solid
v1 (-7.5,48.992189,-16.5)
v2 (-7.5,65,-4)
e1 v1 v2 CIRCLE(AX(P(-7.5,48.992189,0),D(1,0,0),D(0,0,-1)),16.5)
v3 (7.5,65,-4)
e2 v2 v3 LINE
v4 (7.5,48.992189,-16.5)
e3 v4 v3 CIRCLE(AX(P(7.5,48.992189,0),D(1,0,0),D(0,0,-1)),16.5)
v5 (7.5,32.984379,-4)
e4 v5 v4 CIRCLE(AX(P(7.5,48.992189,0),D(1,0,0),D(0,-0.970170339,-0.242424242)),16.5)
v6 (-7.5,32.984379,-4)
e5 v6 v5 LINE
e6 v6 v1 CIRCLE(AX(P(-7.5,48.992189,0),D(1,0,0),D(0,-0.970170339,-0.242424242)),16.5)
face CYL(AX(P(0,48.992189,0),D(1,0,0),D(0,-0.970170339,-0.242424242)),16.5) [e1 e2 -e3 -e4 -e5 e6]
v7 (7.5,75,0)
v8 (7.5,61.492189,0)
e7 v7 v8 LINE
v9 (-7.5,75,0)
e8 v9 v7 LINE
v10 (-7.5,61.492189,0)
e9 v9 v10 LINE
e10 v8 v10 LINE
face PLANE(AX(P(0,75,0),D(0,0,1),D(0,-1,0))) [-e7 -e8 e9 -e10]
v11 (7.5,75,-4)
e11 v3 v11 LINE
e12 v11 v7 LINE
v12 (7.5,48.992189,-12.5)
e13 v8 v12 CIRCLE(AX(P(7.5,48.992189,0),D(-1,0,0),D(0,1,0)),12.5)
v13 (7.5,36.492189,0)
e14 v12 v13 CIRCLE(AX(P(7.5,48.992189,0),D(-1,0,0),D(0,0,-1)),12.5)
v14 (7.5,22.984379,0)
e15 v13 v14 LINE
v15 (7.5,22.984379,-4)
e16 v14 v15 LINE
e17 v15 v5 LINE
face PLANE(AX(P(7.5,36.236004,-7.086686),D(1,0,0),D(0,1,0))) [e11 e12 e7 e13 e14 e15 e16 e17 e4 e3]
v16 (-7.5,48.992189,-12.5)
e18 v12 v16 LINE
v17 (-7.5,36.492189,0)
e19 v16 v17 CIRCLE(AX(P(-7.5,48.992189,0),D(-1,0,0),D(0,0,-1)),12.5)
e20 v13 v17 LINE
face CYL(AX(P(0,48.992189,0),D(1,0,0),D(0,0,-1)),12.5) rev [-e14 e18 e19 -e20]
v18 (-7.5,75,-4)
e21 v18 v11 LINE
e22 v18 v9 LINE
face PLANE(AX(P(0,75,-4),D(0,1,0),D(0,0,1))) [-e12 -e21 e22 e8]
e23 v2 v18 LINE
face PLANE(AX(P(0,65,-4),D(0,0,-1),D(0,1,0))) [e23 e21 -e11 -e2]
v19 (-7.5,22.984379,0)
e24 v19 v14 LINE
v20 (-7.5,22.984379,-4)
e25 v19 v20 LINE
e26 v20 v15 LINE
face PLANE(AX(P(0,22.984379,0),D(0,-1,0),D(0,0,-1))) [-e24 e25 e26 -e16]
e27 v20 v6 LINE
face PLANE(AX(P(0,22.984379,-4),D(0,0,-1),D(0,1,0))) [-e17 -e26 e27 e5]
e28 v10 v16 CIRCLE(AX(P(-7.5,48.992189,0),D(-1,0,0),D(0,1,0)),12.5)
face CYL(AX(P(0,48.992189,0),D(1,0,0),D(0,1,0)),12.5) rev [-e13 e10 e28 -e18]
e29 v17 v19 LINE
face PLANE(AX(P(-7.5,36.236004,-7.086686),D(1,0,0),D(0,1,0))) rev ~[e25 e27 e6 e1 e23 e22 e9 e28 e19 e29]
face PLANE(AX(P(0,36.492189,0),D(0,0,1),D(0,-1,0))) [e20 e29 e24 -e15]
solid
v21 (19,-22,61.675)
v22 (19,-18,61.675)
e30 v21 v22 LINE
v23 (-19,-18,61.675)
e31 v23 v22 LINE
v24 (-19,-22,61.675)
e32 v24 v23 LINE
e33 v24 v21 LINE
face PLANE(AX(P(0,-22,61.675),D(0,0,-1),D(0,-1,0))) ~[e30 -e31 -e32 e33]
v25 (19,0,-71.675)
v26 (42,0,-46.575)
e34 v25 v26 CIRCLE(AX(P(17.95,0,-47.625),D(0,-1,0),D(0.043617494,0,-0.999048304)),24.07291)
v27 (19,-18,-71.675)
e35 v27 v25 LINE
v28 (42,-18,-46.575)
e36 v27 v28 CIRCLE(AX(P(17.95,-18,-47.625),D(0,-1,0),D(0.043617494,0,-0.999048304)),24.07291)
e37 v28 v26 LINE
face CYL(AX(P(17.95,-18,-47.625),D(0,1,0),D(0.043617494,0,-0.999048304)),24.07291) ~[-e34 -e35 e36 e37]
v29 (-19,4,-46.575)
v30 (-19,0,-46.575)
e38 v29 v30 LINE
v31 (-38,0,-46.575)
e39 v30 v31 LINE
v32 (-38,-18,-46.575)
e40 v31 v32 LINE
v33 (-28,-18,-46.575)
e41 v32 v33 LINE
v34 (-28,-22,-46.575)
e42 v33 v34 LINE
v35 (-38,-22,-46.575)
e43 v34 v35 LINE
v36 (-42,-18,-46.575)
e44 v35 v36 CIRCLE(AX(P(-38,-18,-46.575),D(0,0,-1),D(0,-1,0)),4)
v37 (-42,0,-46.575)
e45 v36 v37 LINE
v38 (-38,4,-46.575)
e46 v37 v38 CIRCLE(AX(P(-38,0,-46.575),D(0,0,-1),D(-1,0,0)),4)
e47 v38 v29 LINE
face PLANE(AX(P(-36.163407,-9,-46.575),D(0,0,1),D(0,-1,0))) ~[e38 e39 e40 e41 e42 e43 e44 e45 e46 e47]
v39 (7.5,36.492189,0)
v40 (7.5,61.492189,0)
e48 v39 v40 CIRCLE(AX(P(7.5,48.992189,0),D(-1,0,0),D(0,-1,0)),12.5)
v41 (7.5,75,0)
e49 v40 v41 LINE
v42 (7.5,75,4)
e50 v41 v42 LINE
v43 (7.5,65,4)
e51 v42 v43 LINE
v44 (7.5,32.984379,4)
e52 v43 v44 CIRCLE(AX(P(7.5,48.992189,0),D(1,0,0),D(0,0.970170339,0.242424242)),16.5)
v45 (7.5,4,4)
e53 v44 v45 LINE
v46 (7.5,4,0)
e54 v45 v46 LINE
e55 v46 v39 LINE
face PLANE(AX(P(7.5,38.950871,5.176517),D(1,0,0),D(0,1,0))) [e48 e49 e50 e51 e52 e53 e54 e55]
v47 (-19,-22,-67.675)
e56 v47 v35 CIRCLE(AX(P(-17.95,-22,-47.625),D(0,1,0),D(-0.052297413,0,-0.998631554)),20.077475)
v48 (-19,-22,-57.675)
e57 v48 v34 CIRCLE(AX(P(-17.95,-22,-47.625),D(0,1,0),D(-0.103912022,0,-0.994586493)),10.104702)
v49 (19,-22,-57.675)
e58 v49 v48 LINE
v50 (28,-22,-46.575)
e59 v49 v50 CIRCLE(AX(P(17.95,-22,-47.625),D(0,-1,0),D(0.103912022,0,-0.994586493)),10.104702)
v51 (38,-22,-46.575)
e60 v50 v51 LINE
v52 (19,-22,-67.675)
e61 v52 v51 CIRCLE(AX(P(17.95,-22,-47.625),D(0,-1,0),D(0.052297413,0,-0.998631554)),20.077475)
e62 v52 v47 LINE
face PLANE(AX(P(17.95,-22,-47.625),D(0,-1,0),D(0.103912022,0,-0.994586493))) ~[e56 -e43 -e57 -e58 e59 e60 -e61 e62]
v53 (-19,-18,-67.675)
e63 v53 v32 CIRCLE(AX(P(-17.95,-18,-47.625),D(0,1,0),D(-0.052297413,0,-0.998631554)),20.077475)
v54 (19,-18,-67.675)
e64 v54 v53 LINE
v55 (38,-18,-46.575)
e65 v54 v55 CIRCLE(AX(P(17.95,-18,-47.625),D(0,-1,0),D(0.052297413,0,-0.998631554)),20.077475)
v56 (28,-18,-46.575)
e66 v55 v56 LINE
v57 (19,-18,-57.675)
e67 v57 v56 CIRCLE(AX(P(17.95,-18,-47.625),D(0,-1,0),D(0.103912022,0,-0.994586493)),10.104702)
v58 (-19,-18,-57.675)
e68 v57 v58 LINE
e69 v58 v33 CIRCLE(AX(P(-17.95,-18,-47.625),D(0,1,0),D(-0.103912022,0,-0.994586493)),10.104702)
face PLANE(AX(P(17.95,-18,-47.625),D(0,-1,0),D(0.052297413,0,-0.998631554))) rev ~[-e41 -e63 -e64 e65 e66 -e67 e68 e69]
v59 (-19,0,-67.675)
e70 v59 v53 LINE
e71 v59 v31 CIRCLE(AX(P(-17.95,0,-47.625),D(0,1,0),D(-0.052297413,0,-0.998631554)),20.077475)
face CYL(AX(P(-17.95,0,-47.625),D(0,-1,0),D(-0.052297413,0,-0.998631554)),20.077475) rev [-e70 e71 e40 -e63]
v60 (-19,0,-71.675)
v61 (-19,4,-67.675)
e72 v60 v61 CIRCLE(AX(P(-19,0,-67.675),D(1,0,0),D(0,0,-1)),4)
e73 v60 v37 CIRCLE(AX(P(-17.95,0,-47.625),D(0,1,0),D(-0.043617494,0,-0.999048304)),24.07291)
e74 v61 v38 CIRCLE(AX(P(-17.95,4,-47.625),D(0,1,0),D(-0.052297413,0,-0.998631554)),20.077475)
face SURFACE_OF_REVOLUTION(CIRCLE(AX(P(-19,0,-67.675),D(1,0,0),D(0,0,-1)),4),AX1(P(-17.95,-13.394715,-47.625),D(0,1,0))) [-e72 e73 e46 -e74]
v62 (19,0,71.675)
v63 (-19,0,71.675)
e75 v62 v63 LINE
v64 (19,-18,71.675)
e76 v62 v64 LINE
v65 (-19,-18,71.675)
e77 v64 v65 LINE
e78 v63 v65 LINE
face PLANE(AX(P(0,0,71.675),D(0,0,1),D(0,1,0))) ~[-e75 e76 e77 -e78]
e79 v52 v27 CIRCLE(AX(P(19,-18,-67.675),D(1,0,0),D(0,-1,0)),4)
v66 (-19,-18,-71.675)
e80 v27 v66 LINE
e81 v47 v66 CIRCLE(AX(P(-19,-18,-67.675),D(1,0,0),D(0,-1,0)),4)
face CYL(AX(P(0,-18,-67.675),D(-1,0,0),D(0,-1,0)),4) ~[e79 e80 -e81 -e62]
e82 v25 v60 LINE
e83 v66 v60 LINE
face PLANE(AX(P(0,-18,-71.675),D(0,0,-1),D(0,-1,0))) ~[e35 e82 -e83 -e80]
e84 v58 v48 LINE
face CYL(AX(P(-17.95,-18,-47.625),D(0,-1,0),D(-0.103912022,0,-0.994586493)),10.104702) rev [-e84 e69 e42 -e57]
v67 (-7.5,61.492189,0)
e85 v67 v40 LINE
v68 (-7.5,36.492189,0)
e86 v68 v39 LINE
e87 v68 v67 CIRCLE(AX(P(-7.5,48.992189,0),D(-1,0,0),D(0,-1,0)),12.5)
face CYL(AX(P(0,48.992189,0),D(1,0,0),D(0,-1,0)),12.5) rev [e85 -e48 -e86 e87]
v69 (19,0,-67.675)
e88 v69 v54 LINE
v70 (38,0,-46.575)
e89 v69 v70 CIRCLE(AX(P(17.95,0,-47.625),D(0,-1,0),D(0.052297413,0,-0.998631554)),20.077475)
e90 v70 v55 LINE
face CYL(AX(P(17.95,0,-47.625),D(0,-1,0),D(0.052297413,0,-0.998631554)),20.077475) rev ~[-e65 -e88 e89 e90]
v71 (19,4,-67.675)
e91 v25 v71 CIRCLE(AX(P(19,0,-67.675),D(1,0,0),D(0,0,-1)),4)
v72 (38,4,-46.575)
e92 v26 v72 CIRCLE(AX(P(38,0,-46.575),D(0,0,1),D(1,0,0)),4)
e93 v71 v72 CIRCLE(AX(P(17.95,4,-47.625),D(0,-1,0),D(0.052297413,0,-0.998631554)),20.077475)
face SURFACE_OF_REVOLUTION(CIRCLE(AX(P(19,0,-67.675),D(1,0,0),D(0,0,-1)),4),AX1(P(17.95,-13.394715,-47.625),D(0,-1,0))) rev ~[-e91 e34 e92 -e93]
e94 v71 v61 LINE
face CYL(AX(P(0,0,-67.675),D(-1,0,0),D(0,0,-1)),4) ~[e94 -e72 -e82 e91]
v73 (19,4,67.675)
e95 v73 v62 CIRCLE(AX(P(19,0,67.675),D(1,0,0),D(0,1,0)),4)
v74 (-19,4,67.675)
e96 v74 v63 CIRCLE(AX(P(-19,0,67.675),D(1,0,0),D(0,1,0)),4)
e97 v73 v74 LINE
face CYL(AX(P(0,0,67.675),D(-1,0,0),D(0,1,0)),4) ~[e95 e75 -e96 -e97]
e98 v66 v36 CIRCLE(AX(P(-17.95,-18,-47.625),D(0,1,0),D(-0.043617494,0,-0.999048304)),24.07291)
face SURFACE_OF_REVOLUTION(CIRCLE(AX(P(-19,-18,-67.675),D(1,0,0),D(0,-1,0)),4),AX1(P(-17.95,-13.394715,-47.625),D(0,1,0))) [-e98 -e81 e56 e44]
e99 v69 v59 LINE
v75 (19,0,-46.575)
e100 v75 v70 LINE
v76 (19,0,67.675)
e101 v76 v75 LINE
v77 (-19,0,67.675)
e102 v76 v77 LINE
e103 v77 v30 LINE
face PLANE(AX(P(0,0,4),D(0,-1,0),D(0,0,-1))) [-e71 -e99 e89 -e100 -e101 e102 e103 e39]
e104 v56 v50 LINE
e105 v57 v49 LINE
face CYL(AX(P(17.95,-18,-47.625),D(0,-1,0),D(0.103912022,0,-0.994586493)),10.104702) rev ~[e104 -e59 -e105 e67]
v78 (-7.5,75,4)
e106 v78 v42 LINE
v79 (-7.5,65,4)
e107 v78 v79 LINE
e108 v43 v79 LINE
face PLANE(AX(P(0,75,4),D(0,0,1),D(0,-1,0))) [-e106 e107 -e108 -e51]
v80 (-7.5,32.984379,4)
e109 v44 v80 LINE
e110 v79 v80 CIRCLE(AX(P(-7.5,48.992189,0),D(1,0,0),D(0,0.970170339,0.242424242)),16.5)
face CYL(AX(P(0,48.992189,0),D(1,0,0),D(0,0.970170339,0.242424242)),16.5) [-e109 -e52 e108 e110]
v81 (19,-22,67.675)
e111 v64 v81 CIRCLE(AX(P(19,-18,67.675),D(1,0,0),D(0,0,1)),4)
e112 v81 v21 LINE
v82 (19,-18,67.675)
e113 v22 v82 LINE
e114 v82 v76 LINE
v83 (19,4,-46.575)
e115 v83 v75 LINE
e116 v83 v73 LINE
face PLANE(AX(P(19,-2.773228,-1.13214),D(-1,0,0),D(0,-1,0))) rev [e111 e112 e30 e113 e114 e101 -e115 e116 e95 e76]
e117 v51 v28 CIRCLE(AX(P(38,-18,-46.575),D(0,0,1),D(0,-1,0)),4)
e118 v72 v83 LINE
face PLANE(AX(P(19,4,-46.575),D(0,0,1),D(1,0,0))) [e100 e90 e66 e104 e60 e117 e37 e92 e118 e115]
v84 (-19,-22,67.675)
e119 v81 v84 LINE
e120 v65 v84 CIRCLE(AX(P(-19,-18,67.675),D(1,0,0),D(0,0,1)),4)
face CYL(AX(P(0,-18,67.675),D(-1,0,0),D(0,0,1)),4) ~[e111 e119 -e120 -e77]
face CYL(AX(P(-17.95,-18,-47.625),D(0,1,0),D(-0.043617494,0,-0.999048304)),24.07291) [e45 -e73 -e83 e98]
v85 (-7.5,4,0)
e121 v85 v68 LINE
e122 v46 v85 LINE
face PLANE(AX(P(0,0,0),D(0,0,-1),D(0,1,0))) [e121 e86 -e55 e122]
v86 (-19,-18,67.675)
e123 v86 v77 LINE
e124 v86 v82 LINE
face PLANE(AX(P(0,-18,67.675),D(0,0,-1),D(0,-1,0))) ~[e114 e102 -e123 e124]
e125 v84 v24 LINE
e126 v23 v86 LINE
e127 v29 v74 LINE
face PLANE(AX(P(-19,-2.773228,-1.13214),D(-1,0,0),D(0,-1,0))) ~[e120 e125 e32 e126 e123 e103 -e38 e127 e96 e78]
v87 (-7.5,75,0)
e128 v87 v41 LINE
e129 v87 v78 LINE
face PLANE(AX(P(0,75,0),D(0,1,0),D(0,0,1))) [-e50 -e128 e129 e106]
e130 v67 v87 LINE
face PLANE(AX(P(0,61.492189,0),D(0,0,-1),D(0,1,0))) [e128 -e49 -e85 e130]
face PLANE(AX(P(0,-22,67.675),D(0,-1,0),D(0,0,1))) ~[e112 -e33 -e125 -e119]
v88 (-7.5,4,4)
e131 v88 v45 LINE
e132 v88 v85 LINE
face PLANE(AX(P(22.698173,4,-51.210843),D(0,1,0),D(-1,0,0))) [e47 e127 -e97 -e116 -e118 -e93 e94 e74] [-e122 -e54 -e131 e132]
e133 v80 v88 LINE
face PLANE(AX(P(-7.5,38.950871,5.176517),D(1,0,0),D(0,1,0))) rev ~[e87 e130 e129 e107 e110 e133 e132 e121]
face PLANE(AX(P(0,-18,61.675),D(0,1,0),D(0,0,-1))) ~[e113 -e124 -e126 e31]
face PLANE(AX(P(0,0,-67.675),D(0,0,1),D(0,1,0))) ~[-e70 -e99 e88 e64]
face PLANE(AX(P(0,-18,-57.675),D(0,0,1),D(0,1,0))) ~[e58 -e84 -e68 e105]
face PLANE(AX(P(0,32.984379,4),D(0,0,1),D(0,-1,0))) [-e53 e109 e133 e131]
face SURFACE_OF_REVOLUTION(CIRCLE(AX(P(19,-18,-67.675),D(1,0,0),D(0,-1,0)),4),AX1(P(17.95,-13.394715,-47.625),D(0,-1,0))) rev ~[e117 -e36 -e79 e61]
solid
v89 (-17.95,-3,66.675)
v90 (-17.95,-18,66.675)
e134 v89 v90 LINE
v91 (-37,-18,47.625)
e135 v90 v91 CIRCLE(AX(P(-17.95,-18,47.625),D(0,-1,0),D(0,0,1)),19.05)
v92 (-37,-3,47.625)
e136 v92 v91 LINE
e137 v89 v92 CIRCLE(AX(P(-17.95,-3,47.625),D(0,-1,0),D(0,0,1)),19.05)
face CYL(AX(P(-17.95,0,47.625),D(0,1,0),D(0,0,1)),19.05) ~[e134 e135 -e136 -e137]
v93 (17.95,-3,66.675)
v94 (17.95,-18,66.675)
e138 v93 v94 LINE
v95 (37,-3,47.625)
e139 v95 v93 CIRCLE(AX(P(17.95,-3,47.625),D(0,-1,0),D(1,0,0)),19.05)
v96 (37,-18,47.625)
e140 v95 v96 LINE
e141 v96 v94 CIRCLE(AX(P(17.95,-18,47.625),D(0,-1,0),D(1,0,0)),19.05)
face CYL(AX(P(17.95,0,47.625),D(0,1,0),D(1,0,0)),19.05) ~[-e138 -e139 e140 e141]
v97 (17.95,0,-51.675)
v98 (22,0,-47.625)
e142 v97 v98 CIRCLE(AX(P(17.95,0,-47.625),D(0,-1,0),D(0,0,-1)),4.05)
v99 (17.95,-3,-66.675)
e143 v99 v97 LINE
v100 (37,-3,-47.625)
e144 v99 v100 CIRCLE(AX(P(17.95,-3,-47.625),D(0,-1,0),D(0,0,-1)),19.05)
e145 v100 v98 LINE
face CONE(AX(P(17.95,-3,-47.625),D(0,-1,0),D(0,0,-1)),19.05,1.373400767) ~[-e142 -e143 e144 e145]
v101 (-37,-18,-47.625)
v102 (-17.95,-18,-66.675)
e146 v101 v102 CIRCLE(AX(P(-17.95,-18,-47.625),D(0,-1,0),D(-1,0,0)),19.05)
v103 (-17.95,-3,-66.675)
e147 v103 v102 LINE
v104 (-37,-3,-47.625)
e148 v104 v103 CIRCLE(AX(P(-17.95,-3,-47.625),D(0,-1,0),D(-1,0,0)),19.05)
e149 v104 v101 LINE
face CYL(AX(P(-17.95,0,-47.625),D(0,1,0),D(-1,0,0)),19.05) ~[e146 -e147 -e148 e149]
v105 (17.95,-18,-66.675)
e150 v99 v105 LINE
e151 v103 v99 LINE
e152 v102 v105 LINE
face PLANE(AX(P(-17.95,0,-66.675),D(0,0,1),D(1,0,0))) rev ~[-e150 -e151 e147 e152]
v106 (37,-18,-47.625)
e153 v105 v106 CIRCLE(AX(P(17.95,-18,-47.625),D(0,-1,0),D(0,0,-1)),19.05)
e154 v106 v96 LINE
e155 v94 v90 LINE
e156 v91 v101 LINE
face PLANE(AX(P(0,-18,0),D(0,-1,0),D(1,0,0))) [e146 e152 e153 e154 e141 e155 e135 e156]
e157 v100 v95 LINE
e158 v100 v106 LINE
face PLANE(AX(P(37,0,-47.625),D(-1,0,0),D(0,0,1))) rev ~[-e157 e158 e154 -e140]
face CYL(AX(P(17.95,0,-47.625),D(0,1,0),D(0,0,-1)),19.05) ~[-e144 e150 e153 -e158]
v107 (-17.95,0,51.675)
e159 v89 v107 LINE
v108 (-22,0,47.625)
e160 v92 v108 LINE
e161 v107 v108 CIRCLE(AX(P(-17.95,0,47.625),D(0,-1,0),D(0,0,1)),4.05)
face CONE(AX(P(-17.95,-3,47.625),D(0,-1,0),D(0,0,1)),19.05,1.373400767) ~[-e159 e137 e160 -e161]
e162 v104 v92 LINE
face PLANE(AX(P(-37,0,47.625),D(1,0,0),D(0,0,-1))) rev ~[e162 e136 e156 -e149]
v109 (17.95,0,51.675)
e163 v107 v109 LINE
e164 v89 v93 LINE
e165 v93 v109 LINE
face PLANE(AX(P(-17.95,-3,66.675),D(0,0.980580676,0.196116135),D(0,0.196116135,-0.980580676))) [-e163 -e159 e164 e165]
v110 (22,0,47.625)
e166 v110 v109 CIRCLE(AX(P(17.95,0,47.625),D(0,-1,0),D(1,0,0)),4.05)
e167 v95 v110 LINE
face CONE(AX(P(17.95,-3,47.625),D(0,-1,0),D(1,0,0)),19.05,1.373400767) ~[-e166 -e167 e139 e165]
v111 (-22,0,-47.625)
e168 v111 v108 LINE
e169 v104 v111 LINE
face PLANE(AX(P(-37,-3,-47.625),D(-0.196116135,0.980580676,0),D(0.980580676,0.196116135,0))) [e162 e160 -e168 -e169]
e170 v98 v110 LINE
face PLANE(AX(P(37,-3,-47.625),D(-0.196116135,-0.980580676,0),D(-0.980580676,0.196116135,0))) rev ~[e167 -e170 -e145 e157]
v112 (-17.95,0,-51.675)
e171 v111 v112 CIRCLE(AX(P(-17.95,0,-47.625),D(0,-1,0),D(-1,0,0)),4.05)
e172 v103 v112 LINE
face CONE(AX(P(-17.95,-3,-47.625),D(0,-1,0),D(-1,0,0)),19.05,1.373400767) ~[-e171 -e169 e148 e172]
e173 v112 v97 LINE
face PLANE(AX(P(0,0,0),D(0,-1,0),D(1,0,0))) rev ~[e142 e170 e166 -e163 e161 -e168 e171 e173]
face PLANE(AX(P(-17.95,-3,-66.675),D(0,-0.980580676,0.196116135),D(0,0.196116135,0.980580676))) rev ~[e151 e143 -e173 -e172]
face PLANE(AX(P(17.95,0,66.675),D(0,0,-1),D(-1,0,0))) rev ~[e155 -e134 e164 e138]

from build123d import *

# Parameters (mm, degrees)
F1_DEPTH     = 18
F2_T1_DEPTH  = 35.9
F2_T3_DEPTH  = 95.25
F2_T6_ANGLE  = 90
F2_T8_ANGLE  = 90
F2_T10_ANGLE = 90
F2_T12_ANGLE = 90
F4_DEPTH     = 19
F8_ANGLE     = 90
F12_DEPTH    = 4
F14_DEPTH    = 7.5
F15_DEPTH    = 7.5


# Not quite as in the source:
# - a fillet or chamfer that OpenCascade refuses, or shapes differently, is made with other operations: its cross-section is extruded or revolved along the edge and cut away or added


with BuildPart() as f1:
    # F0 (on Front) → F1 (new body)
    with BuildSketch(Plane.XZ):
        with BuildLine():
            Line((-17.95, -66.675), (17.95, -66.675))
            ThreePointArc((17.95, -66.675), (31.4203841816, -61.0953841816), (37, -47.625))
            Line((37, -47.625), (37, 47.625))
            ThreePointArc((37, 47.625), (31.4203841816, 61.0953841816), (17.95, 66.675))
            Line((17.95, 66.675), (-17.95, 66.675))
            ThreePointArc((-17.95, 66.675), (-31.4203841816, 61.0953841816), (-37, 47.625))
            Line((-37, 47.625), (-37, -47.625))
            ThreePointArc((-37, -47.625), (-31.4203841816, -61.0953841816), (-17.95, -66.675))
        make_face()
    extrude(amount=F1_DEPTH)

    # F2: chamfer of 15 x 3 on 8 edges, made by hand

    # F2_s2 → F2_t1 (cut)
    with BuildSketch(Plane.YZ.offset(-17.95)):
        Polygon((-3, -66.675), (0, -51.675), (0, -66.675), align=None)
        Polygon((-3, 66.675), (0, 51.675), (0, 66.675), align=None)
    extrude(amount=F2_T1_DEPTH, mode=Mode.SUBTRACT)

    # F2_s4 → F2_t3 (cut)
    with BuildSketch(Plane.XY.offset(-47.625)):
        Polygon((37, -3), (22, 0), (37, 0), align=None)
        Polygon((-37, -3), (-22, 0), (-37, 0), align=None)
    extrude(amount=F2_T3_DEPTH, mode=Mode.SUBTRACT)

    # F2_s5 → F2_t6 (revolve, cut)
    with BuildSketch(Plane.YZ.offset(17.95)):
        Polygon((-3, -66.675), (0, -51.675), (0, -66.675), align=None)
    revolve(axis=Axis((17.95, 0, -47.625), (0, -1, 0)), revolution_arc=F2_T6_ANGLE, mode=Mode.SUBTRACT)

    # F2_s7 → F2_t8 (revolve, cut)
    with BuildSketch(Plane.XY.offset(47.625)):
        Polygon((37, -3), (22, 0), (37, 0), align=None)
    revolve(axis=Axis((17.95, 0, 47.625), (0, -1, 0)), revolution_arc=F2_T8_ANGLE, mode=Mode.SUBTRACT)

    # F2_s9 → F2_t10 (revolve, cut)
    with BuildSketch(Plane.YZ.offset(-17.95)):
        Polygon((-3, 66.675), (0, 51.675), (0, 66.675), align=None)
    revolve(axis=Axis((-17.95, 0, 47.625), (0, -1, 0)), revolution_arc=F2_T10_ANGLE, mode=Mode.SUBTRACT)

    # F2_s11 → F2_t12 (revolve, cut)
    with BuildSketch(Plane.XY.offset(-47.625)):
        Polygon((-37, -3), (-22, 0), (-37, 0), align=None)
    revolve(axis=Axis((-17.95, 0, -47.625), (0, -1, 0)), revolution_arc=F2_T12_ANGLE, mode=Mode.SUBTRACT)


with BuildPart() as f4:
    # F3 (on Right) → F4 (new body, symmetric)
    with BuildSketch(Plane.YZ):
        with BuildLine():
            Line((-18, 66.675), (-18, 67.675))
            Line((-18, 67.675), (-1.4493813505, 67.675))
            Line((-1.4493813505, 67.675), (0, 67.675))
            Line((0, 67.675), (0, -67.675))
            Line((0, -67.675), (-18, -67.675))
            Line((-18, -67.675), (-18, -57.675))
            Line((-18, -57.675), (-22, -57.675))
            Line((-22, -57.675), (-22, -67.675))
            ThreePointArc((-22, -67.675), (-20.8284271247, -70.5034271247), (-18, -71.675))
            Line((-18, -71.675), (0, -71.675))
            ThreePointArc((0, -71.675), (2.8284271247, -70.5034271247), (4, -67.675))
            Line((4, -67.675), (4, 67.675))
            ThreePointArc((4, 67.675), (2.8284271247, 70.5034271247), (0, 71.675))
            Line((0, 71.675), (-18, 71.675))
            ThreePointArc((-18, 71.675), (-20.8284271247, 70.5034271247), (-22, 67.675))
            Line((-22, 67.675), (-22, 61.675))
            Line((-22, 61.675), (-18, 61.675))
            Line((-18, 61.675), (-18, 66.675))
        make_face()
    extrude(amount=F4_DEPTH, both=True)

    # F5 (on face) → F8 (revolve)
    with BuildSketch(Plane.YZ.offset(19)):
        with BuildLine():
            Line((0, -67.675), (-18, -67.675))
            Line((-18, -67.675), (-18, -57.675))
            Line((-18, -57.675), (-22, -57.675))
            Line((-22, -57.675), (-22, -67.675))
            ThreePointArc((-22, -67.675), (-20.8284271247, -70.5034271247), (-18, -71.675))
            Line((-18, -71.675), (0, -71.675))
            ThreePointArc((0, -71.675), (2.8284271247, -70.5034271247), (4, -67.675))
            Line((4, -67.675), (4, -57.675))
            Line((4, -57.675), (0, -57.675))
            Line((0, -57.675), (0, -67.675))
        make_face()
    revolve(axis=Axis((17.95, -13.3947152644, -47.625), (0, -1, 0)), revolution_arc=F8_ANGLE)


with BuildPart() as f9_1:
    # F9: instance of F4
    add(f4.part.mirror(Plane.YZ))

    # F10: union F4
    add(f4.part)

    # F11 (on face) → F12 (join)
    with BuildSketch(Plane(origin=(0, 4, 0), x_dir=(-1, 0, 0), z_dir=(0, 1, 0))):
        with BuildLine():
            Line((-19, -46.575), (-28, -46.575))
            ThreePointArc((-28, -46.575), (-25.7988852712, -53.9889610307), (-19, -57.675))
            Line((-19, -57.675), (-19, -46.575))
        make_face()
        with BuildLine():
            Line((28, -46.575), (19, -46.575))
            Line((19, -46.575), (19, -57.675))
            ThreePointArc((19, -57.675), (25.7988852712, -53.9889610307), (28, -46.575))
        make_face()
    extrude(amount=-F12_DEPTH)

    # F13 (on Right) → F14 (join, symmetric)
    with BuildSketch(Plane.YZ):
        with BuildLine():
            Line((0, 4), (0, 0))
            Line((0, 0), (22.9843788128, 0))
            Line((22.9843788128, 0), (36.4921894064, 0))
            ThreePointArc((36.4921894064, 0), (48.9921894064, 12.5), (61.4921894064, 0))
            Line((61.4921894064, 0), (75, 0))
            Line((75, 0), (75, 4))
            Line((75, 4), (65, 4))
            ThreePointArc((65, 4), (48.9921894064, 16.5), (32.9843788128, 4))
            Line((32.9843788128, 4), (0, 4))
        make_face()
    extrude(amount=F14_DEPTH, both=True)


with BuildPart() as f15:
    # F13 (on Right) → F15 (new body, symmetric)
    with BuildSketch(Plane.YZ):
        with BuildLine():
            Line((36.4921894064, 0), (22.9843788128, 0))
            Line((22.9843788128, 0), (22.9843788128, -4))
            Line((22.9843788128, -4), (32.9843788128, -4))
            ThreePointArc((32.9843788128, -4), (38.8371414006, -13.0048068036), (48.9921894064, -16.5))
            Line((48.9921894064, -16.5), (48.9921894064, -12.5))
            ThreePointArc((48.9921894064, -12.5), (40.1533546416, -8.8388347648), (36.4921894064, 0))
        make_face()
        with BuildLine():
            Line((75, 0), (61.4921894064, 0))
            ThreePointArc((61.4921894064, 0), (57.8310241712, -8.8388347648), (48.9921894064, -12.5))
            Line((48.9921894064, -12.5), (48.9921894064, -16.5))
            ThreePointArc((48.9921894064, -16.5), (59.1472374122, -13.0048068036), (65, -4))
            Line((65, -4), (75, -4))
            Line((75, -4), (75, 0))
        make_face()
    extrude(amount=F15_DEPTH, both=True)


solid = Compound([f1.part, f9_1.part, f15.part])
